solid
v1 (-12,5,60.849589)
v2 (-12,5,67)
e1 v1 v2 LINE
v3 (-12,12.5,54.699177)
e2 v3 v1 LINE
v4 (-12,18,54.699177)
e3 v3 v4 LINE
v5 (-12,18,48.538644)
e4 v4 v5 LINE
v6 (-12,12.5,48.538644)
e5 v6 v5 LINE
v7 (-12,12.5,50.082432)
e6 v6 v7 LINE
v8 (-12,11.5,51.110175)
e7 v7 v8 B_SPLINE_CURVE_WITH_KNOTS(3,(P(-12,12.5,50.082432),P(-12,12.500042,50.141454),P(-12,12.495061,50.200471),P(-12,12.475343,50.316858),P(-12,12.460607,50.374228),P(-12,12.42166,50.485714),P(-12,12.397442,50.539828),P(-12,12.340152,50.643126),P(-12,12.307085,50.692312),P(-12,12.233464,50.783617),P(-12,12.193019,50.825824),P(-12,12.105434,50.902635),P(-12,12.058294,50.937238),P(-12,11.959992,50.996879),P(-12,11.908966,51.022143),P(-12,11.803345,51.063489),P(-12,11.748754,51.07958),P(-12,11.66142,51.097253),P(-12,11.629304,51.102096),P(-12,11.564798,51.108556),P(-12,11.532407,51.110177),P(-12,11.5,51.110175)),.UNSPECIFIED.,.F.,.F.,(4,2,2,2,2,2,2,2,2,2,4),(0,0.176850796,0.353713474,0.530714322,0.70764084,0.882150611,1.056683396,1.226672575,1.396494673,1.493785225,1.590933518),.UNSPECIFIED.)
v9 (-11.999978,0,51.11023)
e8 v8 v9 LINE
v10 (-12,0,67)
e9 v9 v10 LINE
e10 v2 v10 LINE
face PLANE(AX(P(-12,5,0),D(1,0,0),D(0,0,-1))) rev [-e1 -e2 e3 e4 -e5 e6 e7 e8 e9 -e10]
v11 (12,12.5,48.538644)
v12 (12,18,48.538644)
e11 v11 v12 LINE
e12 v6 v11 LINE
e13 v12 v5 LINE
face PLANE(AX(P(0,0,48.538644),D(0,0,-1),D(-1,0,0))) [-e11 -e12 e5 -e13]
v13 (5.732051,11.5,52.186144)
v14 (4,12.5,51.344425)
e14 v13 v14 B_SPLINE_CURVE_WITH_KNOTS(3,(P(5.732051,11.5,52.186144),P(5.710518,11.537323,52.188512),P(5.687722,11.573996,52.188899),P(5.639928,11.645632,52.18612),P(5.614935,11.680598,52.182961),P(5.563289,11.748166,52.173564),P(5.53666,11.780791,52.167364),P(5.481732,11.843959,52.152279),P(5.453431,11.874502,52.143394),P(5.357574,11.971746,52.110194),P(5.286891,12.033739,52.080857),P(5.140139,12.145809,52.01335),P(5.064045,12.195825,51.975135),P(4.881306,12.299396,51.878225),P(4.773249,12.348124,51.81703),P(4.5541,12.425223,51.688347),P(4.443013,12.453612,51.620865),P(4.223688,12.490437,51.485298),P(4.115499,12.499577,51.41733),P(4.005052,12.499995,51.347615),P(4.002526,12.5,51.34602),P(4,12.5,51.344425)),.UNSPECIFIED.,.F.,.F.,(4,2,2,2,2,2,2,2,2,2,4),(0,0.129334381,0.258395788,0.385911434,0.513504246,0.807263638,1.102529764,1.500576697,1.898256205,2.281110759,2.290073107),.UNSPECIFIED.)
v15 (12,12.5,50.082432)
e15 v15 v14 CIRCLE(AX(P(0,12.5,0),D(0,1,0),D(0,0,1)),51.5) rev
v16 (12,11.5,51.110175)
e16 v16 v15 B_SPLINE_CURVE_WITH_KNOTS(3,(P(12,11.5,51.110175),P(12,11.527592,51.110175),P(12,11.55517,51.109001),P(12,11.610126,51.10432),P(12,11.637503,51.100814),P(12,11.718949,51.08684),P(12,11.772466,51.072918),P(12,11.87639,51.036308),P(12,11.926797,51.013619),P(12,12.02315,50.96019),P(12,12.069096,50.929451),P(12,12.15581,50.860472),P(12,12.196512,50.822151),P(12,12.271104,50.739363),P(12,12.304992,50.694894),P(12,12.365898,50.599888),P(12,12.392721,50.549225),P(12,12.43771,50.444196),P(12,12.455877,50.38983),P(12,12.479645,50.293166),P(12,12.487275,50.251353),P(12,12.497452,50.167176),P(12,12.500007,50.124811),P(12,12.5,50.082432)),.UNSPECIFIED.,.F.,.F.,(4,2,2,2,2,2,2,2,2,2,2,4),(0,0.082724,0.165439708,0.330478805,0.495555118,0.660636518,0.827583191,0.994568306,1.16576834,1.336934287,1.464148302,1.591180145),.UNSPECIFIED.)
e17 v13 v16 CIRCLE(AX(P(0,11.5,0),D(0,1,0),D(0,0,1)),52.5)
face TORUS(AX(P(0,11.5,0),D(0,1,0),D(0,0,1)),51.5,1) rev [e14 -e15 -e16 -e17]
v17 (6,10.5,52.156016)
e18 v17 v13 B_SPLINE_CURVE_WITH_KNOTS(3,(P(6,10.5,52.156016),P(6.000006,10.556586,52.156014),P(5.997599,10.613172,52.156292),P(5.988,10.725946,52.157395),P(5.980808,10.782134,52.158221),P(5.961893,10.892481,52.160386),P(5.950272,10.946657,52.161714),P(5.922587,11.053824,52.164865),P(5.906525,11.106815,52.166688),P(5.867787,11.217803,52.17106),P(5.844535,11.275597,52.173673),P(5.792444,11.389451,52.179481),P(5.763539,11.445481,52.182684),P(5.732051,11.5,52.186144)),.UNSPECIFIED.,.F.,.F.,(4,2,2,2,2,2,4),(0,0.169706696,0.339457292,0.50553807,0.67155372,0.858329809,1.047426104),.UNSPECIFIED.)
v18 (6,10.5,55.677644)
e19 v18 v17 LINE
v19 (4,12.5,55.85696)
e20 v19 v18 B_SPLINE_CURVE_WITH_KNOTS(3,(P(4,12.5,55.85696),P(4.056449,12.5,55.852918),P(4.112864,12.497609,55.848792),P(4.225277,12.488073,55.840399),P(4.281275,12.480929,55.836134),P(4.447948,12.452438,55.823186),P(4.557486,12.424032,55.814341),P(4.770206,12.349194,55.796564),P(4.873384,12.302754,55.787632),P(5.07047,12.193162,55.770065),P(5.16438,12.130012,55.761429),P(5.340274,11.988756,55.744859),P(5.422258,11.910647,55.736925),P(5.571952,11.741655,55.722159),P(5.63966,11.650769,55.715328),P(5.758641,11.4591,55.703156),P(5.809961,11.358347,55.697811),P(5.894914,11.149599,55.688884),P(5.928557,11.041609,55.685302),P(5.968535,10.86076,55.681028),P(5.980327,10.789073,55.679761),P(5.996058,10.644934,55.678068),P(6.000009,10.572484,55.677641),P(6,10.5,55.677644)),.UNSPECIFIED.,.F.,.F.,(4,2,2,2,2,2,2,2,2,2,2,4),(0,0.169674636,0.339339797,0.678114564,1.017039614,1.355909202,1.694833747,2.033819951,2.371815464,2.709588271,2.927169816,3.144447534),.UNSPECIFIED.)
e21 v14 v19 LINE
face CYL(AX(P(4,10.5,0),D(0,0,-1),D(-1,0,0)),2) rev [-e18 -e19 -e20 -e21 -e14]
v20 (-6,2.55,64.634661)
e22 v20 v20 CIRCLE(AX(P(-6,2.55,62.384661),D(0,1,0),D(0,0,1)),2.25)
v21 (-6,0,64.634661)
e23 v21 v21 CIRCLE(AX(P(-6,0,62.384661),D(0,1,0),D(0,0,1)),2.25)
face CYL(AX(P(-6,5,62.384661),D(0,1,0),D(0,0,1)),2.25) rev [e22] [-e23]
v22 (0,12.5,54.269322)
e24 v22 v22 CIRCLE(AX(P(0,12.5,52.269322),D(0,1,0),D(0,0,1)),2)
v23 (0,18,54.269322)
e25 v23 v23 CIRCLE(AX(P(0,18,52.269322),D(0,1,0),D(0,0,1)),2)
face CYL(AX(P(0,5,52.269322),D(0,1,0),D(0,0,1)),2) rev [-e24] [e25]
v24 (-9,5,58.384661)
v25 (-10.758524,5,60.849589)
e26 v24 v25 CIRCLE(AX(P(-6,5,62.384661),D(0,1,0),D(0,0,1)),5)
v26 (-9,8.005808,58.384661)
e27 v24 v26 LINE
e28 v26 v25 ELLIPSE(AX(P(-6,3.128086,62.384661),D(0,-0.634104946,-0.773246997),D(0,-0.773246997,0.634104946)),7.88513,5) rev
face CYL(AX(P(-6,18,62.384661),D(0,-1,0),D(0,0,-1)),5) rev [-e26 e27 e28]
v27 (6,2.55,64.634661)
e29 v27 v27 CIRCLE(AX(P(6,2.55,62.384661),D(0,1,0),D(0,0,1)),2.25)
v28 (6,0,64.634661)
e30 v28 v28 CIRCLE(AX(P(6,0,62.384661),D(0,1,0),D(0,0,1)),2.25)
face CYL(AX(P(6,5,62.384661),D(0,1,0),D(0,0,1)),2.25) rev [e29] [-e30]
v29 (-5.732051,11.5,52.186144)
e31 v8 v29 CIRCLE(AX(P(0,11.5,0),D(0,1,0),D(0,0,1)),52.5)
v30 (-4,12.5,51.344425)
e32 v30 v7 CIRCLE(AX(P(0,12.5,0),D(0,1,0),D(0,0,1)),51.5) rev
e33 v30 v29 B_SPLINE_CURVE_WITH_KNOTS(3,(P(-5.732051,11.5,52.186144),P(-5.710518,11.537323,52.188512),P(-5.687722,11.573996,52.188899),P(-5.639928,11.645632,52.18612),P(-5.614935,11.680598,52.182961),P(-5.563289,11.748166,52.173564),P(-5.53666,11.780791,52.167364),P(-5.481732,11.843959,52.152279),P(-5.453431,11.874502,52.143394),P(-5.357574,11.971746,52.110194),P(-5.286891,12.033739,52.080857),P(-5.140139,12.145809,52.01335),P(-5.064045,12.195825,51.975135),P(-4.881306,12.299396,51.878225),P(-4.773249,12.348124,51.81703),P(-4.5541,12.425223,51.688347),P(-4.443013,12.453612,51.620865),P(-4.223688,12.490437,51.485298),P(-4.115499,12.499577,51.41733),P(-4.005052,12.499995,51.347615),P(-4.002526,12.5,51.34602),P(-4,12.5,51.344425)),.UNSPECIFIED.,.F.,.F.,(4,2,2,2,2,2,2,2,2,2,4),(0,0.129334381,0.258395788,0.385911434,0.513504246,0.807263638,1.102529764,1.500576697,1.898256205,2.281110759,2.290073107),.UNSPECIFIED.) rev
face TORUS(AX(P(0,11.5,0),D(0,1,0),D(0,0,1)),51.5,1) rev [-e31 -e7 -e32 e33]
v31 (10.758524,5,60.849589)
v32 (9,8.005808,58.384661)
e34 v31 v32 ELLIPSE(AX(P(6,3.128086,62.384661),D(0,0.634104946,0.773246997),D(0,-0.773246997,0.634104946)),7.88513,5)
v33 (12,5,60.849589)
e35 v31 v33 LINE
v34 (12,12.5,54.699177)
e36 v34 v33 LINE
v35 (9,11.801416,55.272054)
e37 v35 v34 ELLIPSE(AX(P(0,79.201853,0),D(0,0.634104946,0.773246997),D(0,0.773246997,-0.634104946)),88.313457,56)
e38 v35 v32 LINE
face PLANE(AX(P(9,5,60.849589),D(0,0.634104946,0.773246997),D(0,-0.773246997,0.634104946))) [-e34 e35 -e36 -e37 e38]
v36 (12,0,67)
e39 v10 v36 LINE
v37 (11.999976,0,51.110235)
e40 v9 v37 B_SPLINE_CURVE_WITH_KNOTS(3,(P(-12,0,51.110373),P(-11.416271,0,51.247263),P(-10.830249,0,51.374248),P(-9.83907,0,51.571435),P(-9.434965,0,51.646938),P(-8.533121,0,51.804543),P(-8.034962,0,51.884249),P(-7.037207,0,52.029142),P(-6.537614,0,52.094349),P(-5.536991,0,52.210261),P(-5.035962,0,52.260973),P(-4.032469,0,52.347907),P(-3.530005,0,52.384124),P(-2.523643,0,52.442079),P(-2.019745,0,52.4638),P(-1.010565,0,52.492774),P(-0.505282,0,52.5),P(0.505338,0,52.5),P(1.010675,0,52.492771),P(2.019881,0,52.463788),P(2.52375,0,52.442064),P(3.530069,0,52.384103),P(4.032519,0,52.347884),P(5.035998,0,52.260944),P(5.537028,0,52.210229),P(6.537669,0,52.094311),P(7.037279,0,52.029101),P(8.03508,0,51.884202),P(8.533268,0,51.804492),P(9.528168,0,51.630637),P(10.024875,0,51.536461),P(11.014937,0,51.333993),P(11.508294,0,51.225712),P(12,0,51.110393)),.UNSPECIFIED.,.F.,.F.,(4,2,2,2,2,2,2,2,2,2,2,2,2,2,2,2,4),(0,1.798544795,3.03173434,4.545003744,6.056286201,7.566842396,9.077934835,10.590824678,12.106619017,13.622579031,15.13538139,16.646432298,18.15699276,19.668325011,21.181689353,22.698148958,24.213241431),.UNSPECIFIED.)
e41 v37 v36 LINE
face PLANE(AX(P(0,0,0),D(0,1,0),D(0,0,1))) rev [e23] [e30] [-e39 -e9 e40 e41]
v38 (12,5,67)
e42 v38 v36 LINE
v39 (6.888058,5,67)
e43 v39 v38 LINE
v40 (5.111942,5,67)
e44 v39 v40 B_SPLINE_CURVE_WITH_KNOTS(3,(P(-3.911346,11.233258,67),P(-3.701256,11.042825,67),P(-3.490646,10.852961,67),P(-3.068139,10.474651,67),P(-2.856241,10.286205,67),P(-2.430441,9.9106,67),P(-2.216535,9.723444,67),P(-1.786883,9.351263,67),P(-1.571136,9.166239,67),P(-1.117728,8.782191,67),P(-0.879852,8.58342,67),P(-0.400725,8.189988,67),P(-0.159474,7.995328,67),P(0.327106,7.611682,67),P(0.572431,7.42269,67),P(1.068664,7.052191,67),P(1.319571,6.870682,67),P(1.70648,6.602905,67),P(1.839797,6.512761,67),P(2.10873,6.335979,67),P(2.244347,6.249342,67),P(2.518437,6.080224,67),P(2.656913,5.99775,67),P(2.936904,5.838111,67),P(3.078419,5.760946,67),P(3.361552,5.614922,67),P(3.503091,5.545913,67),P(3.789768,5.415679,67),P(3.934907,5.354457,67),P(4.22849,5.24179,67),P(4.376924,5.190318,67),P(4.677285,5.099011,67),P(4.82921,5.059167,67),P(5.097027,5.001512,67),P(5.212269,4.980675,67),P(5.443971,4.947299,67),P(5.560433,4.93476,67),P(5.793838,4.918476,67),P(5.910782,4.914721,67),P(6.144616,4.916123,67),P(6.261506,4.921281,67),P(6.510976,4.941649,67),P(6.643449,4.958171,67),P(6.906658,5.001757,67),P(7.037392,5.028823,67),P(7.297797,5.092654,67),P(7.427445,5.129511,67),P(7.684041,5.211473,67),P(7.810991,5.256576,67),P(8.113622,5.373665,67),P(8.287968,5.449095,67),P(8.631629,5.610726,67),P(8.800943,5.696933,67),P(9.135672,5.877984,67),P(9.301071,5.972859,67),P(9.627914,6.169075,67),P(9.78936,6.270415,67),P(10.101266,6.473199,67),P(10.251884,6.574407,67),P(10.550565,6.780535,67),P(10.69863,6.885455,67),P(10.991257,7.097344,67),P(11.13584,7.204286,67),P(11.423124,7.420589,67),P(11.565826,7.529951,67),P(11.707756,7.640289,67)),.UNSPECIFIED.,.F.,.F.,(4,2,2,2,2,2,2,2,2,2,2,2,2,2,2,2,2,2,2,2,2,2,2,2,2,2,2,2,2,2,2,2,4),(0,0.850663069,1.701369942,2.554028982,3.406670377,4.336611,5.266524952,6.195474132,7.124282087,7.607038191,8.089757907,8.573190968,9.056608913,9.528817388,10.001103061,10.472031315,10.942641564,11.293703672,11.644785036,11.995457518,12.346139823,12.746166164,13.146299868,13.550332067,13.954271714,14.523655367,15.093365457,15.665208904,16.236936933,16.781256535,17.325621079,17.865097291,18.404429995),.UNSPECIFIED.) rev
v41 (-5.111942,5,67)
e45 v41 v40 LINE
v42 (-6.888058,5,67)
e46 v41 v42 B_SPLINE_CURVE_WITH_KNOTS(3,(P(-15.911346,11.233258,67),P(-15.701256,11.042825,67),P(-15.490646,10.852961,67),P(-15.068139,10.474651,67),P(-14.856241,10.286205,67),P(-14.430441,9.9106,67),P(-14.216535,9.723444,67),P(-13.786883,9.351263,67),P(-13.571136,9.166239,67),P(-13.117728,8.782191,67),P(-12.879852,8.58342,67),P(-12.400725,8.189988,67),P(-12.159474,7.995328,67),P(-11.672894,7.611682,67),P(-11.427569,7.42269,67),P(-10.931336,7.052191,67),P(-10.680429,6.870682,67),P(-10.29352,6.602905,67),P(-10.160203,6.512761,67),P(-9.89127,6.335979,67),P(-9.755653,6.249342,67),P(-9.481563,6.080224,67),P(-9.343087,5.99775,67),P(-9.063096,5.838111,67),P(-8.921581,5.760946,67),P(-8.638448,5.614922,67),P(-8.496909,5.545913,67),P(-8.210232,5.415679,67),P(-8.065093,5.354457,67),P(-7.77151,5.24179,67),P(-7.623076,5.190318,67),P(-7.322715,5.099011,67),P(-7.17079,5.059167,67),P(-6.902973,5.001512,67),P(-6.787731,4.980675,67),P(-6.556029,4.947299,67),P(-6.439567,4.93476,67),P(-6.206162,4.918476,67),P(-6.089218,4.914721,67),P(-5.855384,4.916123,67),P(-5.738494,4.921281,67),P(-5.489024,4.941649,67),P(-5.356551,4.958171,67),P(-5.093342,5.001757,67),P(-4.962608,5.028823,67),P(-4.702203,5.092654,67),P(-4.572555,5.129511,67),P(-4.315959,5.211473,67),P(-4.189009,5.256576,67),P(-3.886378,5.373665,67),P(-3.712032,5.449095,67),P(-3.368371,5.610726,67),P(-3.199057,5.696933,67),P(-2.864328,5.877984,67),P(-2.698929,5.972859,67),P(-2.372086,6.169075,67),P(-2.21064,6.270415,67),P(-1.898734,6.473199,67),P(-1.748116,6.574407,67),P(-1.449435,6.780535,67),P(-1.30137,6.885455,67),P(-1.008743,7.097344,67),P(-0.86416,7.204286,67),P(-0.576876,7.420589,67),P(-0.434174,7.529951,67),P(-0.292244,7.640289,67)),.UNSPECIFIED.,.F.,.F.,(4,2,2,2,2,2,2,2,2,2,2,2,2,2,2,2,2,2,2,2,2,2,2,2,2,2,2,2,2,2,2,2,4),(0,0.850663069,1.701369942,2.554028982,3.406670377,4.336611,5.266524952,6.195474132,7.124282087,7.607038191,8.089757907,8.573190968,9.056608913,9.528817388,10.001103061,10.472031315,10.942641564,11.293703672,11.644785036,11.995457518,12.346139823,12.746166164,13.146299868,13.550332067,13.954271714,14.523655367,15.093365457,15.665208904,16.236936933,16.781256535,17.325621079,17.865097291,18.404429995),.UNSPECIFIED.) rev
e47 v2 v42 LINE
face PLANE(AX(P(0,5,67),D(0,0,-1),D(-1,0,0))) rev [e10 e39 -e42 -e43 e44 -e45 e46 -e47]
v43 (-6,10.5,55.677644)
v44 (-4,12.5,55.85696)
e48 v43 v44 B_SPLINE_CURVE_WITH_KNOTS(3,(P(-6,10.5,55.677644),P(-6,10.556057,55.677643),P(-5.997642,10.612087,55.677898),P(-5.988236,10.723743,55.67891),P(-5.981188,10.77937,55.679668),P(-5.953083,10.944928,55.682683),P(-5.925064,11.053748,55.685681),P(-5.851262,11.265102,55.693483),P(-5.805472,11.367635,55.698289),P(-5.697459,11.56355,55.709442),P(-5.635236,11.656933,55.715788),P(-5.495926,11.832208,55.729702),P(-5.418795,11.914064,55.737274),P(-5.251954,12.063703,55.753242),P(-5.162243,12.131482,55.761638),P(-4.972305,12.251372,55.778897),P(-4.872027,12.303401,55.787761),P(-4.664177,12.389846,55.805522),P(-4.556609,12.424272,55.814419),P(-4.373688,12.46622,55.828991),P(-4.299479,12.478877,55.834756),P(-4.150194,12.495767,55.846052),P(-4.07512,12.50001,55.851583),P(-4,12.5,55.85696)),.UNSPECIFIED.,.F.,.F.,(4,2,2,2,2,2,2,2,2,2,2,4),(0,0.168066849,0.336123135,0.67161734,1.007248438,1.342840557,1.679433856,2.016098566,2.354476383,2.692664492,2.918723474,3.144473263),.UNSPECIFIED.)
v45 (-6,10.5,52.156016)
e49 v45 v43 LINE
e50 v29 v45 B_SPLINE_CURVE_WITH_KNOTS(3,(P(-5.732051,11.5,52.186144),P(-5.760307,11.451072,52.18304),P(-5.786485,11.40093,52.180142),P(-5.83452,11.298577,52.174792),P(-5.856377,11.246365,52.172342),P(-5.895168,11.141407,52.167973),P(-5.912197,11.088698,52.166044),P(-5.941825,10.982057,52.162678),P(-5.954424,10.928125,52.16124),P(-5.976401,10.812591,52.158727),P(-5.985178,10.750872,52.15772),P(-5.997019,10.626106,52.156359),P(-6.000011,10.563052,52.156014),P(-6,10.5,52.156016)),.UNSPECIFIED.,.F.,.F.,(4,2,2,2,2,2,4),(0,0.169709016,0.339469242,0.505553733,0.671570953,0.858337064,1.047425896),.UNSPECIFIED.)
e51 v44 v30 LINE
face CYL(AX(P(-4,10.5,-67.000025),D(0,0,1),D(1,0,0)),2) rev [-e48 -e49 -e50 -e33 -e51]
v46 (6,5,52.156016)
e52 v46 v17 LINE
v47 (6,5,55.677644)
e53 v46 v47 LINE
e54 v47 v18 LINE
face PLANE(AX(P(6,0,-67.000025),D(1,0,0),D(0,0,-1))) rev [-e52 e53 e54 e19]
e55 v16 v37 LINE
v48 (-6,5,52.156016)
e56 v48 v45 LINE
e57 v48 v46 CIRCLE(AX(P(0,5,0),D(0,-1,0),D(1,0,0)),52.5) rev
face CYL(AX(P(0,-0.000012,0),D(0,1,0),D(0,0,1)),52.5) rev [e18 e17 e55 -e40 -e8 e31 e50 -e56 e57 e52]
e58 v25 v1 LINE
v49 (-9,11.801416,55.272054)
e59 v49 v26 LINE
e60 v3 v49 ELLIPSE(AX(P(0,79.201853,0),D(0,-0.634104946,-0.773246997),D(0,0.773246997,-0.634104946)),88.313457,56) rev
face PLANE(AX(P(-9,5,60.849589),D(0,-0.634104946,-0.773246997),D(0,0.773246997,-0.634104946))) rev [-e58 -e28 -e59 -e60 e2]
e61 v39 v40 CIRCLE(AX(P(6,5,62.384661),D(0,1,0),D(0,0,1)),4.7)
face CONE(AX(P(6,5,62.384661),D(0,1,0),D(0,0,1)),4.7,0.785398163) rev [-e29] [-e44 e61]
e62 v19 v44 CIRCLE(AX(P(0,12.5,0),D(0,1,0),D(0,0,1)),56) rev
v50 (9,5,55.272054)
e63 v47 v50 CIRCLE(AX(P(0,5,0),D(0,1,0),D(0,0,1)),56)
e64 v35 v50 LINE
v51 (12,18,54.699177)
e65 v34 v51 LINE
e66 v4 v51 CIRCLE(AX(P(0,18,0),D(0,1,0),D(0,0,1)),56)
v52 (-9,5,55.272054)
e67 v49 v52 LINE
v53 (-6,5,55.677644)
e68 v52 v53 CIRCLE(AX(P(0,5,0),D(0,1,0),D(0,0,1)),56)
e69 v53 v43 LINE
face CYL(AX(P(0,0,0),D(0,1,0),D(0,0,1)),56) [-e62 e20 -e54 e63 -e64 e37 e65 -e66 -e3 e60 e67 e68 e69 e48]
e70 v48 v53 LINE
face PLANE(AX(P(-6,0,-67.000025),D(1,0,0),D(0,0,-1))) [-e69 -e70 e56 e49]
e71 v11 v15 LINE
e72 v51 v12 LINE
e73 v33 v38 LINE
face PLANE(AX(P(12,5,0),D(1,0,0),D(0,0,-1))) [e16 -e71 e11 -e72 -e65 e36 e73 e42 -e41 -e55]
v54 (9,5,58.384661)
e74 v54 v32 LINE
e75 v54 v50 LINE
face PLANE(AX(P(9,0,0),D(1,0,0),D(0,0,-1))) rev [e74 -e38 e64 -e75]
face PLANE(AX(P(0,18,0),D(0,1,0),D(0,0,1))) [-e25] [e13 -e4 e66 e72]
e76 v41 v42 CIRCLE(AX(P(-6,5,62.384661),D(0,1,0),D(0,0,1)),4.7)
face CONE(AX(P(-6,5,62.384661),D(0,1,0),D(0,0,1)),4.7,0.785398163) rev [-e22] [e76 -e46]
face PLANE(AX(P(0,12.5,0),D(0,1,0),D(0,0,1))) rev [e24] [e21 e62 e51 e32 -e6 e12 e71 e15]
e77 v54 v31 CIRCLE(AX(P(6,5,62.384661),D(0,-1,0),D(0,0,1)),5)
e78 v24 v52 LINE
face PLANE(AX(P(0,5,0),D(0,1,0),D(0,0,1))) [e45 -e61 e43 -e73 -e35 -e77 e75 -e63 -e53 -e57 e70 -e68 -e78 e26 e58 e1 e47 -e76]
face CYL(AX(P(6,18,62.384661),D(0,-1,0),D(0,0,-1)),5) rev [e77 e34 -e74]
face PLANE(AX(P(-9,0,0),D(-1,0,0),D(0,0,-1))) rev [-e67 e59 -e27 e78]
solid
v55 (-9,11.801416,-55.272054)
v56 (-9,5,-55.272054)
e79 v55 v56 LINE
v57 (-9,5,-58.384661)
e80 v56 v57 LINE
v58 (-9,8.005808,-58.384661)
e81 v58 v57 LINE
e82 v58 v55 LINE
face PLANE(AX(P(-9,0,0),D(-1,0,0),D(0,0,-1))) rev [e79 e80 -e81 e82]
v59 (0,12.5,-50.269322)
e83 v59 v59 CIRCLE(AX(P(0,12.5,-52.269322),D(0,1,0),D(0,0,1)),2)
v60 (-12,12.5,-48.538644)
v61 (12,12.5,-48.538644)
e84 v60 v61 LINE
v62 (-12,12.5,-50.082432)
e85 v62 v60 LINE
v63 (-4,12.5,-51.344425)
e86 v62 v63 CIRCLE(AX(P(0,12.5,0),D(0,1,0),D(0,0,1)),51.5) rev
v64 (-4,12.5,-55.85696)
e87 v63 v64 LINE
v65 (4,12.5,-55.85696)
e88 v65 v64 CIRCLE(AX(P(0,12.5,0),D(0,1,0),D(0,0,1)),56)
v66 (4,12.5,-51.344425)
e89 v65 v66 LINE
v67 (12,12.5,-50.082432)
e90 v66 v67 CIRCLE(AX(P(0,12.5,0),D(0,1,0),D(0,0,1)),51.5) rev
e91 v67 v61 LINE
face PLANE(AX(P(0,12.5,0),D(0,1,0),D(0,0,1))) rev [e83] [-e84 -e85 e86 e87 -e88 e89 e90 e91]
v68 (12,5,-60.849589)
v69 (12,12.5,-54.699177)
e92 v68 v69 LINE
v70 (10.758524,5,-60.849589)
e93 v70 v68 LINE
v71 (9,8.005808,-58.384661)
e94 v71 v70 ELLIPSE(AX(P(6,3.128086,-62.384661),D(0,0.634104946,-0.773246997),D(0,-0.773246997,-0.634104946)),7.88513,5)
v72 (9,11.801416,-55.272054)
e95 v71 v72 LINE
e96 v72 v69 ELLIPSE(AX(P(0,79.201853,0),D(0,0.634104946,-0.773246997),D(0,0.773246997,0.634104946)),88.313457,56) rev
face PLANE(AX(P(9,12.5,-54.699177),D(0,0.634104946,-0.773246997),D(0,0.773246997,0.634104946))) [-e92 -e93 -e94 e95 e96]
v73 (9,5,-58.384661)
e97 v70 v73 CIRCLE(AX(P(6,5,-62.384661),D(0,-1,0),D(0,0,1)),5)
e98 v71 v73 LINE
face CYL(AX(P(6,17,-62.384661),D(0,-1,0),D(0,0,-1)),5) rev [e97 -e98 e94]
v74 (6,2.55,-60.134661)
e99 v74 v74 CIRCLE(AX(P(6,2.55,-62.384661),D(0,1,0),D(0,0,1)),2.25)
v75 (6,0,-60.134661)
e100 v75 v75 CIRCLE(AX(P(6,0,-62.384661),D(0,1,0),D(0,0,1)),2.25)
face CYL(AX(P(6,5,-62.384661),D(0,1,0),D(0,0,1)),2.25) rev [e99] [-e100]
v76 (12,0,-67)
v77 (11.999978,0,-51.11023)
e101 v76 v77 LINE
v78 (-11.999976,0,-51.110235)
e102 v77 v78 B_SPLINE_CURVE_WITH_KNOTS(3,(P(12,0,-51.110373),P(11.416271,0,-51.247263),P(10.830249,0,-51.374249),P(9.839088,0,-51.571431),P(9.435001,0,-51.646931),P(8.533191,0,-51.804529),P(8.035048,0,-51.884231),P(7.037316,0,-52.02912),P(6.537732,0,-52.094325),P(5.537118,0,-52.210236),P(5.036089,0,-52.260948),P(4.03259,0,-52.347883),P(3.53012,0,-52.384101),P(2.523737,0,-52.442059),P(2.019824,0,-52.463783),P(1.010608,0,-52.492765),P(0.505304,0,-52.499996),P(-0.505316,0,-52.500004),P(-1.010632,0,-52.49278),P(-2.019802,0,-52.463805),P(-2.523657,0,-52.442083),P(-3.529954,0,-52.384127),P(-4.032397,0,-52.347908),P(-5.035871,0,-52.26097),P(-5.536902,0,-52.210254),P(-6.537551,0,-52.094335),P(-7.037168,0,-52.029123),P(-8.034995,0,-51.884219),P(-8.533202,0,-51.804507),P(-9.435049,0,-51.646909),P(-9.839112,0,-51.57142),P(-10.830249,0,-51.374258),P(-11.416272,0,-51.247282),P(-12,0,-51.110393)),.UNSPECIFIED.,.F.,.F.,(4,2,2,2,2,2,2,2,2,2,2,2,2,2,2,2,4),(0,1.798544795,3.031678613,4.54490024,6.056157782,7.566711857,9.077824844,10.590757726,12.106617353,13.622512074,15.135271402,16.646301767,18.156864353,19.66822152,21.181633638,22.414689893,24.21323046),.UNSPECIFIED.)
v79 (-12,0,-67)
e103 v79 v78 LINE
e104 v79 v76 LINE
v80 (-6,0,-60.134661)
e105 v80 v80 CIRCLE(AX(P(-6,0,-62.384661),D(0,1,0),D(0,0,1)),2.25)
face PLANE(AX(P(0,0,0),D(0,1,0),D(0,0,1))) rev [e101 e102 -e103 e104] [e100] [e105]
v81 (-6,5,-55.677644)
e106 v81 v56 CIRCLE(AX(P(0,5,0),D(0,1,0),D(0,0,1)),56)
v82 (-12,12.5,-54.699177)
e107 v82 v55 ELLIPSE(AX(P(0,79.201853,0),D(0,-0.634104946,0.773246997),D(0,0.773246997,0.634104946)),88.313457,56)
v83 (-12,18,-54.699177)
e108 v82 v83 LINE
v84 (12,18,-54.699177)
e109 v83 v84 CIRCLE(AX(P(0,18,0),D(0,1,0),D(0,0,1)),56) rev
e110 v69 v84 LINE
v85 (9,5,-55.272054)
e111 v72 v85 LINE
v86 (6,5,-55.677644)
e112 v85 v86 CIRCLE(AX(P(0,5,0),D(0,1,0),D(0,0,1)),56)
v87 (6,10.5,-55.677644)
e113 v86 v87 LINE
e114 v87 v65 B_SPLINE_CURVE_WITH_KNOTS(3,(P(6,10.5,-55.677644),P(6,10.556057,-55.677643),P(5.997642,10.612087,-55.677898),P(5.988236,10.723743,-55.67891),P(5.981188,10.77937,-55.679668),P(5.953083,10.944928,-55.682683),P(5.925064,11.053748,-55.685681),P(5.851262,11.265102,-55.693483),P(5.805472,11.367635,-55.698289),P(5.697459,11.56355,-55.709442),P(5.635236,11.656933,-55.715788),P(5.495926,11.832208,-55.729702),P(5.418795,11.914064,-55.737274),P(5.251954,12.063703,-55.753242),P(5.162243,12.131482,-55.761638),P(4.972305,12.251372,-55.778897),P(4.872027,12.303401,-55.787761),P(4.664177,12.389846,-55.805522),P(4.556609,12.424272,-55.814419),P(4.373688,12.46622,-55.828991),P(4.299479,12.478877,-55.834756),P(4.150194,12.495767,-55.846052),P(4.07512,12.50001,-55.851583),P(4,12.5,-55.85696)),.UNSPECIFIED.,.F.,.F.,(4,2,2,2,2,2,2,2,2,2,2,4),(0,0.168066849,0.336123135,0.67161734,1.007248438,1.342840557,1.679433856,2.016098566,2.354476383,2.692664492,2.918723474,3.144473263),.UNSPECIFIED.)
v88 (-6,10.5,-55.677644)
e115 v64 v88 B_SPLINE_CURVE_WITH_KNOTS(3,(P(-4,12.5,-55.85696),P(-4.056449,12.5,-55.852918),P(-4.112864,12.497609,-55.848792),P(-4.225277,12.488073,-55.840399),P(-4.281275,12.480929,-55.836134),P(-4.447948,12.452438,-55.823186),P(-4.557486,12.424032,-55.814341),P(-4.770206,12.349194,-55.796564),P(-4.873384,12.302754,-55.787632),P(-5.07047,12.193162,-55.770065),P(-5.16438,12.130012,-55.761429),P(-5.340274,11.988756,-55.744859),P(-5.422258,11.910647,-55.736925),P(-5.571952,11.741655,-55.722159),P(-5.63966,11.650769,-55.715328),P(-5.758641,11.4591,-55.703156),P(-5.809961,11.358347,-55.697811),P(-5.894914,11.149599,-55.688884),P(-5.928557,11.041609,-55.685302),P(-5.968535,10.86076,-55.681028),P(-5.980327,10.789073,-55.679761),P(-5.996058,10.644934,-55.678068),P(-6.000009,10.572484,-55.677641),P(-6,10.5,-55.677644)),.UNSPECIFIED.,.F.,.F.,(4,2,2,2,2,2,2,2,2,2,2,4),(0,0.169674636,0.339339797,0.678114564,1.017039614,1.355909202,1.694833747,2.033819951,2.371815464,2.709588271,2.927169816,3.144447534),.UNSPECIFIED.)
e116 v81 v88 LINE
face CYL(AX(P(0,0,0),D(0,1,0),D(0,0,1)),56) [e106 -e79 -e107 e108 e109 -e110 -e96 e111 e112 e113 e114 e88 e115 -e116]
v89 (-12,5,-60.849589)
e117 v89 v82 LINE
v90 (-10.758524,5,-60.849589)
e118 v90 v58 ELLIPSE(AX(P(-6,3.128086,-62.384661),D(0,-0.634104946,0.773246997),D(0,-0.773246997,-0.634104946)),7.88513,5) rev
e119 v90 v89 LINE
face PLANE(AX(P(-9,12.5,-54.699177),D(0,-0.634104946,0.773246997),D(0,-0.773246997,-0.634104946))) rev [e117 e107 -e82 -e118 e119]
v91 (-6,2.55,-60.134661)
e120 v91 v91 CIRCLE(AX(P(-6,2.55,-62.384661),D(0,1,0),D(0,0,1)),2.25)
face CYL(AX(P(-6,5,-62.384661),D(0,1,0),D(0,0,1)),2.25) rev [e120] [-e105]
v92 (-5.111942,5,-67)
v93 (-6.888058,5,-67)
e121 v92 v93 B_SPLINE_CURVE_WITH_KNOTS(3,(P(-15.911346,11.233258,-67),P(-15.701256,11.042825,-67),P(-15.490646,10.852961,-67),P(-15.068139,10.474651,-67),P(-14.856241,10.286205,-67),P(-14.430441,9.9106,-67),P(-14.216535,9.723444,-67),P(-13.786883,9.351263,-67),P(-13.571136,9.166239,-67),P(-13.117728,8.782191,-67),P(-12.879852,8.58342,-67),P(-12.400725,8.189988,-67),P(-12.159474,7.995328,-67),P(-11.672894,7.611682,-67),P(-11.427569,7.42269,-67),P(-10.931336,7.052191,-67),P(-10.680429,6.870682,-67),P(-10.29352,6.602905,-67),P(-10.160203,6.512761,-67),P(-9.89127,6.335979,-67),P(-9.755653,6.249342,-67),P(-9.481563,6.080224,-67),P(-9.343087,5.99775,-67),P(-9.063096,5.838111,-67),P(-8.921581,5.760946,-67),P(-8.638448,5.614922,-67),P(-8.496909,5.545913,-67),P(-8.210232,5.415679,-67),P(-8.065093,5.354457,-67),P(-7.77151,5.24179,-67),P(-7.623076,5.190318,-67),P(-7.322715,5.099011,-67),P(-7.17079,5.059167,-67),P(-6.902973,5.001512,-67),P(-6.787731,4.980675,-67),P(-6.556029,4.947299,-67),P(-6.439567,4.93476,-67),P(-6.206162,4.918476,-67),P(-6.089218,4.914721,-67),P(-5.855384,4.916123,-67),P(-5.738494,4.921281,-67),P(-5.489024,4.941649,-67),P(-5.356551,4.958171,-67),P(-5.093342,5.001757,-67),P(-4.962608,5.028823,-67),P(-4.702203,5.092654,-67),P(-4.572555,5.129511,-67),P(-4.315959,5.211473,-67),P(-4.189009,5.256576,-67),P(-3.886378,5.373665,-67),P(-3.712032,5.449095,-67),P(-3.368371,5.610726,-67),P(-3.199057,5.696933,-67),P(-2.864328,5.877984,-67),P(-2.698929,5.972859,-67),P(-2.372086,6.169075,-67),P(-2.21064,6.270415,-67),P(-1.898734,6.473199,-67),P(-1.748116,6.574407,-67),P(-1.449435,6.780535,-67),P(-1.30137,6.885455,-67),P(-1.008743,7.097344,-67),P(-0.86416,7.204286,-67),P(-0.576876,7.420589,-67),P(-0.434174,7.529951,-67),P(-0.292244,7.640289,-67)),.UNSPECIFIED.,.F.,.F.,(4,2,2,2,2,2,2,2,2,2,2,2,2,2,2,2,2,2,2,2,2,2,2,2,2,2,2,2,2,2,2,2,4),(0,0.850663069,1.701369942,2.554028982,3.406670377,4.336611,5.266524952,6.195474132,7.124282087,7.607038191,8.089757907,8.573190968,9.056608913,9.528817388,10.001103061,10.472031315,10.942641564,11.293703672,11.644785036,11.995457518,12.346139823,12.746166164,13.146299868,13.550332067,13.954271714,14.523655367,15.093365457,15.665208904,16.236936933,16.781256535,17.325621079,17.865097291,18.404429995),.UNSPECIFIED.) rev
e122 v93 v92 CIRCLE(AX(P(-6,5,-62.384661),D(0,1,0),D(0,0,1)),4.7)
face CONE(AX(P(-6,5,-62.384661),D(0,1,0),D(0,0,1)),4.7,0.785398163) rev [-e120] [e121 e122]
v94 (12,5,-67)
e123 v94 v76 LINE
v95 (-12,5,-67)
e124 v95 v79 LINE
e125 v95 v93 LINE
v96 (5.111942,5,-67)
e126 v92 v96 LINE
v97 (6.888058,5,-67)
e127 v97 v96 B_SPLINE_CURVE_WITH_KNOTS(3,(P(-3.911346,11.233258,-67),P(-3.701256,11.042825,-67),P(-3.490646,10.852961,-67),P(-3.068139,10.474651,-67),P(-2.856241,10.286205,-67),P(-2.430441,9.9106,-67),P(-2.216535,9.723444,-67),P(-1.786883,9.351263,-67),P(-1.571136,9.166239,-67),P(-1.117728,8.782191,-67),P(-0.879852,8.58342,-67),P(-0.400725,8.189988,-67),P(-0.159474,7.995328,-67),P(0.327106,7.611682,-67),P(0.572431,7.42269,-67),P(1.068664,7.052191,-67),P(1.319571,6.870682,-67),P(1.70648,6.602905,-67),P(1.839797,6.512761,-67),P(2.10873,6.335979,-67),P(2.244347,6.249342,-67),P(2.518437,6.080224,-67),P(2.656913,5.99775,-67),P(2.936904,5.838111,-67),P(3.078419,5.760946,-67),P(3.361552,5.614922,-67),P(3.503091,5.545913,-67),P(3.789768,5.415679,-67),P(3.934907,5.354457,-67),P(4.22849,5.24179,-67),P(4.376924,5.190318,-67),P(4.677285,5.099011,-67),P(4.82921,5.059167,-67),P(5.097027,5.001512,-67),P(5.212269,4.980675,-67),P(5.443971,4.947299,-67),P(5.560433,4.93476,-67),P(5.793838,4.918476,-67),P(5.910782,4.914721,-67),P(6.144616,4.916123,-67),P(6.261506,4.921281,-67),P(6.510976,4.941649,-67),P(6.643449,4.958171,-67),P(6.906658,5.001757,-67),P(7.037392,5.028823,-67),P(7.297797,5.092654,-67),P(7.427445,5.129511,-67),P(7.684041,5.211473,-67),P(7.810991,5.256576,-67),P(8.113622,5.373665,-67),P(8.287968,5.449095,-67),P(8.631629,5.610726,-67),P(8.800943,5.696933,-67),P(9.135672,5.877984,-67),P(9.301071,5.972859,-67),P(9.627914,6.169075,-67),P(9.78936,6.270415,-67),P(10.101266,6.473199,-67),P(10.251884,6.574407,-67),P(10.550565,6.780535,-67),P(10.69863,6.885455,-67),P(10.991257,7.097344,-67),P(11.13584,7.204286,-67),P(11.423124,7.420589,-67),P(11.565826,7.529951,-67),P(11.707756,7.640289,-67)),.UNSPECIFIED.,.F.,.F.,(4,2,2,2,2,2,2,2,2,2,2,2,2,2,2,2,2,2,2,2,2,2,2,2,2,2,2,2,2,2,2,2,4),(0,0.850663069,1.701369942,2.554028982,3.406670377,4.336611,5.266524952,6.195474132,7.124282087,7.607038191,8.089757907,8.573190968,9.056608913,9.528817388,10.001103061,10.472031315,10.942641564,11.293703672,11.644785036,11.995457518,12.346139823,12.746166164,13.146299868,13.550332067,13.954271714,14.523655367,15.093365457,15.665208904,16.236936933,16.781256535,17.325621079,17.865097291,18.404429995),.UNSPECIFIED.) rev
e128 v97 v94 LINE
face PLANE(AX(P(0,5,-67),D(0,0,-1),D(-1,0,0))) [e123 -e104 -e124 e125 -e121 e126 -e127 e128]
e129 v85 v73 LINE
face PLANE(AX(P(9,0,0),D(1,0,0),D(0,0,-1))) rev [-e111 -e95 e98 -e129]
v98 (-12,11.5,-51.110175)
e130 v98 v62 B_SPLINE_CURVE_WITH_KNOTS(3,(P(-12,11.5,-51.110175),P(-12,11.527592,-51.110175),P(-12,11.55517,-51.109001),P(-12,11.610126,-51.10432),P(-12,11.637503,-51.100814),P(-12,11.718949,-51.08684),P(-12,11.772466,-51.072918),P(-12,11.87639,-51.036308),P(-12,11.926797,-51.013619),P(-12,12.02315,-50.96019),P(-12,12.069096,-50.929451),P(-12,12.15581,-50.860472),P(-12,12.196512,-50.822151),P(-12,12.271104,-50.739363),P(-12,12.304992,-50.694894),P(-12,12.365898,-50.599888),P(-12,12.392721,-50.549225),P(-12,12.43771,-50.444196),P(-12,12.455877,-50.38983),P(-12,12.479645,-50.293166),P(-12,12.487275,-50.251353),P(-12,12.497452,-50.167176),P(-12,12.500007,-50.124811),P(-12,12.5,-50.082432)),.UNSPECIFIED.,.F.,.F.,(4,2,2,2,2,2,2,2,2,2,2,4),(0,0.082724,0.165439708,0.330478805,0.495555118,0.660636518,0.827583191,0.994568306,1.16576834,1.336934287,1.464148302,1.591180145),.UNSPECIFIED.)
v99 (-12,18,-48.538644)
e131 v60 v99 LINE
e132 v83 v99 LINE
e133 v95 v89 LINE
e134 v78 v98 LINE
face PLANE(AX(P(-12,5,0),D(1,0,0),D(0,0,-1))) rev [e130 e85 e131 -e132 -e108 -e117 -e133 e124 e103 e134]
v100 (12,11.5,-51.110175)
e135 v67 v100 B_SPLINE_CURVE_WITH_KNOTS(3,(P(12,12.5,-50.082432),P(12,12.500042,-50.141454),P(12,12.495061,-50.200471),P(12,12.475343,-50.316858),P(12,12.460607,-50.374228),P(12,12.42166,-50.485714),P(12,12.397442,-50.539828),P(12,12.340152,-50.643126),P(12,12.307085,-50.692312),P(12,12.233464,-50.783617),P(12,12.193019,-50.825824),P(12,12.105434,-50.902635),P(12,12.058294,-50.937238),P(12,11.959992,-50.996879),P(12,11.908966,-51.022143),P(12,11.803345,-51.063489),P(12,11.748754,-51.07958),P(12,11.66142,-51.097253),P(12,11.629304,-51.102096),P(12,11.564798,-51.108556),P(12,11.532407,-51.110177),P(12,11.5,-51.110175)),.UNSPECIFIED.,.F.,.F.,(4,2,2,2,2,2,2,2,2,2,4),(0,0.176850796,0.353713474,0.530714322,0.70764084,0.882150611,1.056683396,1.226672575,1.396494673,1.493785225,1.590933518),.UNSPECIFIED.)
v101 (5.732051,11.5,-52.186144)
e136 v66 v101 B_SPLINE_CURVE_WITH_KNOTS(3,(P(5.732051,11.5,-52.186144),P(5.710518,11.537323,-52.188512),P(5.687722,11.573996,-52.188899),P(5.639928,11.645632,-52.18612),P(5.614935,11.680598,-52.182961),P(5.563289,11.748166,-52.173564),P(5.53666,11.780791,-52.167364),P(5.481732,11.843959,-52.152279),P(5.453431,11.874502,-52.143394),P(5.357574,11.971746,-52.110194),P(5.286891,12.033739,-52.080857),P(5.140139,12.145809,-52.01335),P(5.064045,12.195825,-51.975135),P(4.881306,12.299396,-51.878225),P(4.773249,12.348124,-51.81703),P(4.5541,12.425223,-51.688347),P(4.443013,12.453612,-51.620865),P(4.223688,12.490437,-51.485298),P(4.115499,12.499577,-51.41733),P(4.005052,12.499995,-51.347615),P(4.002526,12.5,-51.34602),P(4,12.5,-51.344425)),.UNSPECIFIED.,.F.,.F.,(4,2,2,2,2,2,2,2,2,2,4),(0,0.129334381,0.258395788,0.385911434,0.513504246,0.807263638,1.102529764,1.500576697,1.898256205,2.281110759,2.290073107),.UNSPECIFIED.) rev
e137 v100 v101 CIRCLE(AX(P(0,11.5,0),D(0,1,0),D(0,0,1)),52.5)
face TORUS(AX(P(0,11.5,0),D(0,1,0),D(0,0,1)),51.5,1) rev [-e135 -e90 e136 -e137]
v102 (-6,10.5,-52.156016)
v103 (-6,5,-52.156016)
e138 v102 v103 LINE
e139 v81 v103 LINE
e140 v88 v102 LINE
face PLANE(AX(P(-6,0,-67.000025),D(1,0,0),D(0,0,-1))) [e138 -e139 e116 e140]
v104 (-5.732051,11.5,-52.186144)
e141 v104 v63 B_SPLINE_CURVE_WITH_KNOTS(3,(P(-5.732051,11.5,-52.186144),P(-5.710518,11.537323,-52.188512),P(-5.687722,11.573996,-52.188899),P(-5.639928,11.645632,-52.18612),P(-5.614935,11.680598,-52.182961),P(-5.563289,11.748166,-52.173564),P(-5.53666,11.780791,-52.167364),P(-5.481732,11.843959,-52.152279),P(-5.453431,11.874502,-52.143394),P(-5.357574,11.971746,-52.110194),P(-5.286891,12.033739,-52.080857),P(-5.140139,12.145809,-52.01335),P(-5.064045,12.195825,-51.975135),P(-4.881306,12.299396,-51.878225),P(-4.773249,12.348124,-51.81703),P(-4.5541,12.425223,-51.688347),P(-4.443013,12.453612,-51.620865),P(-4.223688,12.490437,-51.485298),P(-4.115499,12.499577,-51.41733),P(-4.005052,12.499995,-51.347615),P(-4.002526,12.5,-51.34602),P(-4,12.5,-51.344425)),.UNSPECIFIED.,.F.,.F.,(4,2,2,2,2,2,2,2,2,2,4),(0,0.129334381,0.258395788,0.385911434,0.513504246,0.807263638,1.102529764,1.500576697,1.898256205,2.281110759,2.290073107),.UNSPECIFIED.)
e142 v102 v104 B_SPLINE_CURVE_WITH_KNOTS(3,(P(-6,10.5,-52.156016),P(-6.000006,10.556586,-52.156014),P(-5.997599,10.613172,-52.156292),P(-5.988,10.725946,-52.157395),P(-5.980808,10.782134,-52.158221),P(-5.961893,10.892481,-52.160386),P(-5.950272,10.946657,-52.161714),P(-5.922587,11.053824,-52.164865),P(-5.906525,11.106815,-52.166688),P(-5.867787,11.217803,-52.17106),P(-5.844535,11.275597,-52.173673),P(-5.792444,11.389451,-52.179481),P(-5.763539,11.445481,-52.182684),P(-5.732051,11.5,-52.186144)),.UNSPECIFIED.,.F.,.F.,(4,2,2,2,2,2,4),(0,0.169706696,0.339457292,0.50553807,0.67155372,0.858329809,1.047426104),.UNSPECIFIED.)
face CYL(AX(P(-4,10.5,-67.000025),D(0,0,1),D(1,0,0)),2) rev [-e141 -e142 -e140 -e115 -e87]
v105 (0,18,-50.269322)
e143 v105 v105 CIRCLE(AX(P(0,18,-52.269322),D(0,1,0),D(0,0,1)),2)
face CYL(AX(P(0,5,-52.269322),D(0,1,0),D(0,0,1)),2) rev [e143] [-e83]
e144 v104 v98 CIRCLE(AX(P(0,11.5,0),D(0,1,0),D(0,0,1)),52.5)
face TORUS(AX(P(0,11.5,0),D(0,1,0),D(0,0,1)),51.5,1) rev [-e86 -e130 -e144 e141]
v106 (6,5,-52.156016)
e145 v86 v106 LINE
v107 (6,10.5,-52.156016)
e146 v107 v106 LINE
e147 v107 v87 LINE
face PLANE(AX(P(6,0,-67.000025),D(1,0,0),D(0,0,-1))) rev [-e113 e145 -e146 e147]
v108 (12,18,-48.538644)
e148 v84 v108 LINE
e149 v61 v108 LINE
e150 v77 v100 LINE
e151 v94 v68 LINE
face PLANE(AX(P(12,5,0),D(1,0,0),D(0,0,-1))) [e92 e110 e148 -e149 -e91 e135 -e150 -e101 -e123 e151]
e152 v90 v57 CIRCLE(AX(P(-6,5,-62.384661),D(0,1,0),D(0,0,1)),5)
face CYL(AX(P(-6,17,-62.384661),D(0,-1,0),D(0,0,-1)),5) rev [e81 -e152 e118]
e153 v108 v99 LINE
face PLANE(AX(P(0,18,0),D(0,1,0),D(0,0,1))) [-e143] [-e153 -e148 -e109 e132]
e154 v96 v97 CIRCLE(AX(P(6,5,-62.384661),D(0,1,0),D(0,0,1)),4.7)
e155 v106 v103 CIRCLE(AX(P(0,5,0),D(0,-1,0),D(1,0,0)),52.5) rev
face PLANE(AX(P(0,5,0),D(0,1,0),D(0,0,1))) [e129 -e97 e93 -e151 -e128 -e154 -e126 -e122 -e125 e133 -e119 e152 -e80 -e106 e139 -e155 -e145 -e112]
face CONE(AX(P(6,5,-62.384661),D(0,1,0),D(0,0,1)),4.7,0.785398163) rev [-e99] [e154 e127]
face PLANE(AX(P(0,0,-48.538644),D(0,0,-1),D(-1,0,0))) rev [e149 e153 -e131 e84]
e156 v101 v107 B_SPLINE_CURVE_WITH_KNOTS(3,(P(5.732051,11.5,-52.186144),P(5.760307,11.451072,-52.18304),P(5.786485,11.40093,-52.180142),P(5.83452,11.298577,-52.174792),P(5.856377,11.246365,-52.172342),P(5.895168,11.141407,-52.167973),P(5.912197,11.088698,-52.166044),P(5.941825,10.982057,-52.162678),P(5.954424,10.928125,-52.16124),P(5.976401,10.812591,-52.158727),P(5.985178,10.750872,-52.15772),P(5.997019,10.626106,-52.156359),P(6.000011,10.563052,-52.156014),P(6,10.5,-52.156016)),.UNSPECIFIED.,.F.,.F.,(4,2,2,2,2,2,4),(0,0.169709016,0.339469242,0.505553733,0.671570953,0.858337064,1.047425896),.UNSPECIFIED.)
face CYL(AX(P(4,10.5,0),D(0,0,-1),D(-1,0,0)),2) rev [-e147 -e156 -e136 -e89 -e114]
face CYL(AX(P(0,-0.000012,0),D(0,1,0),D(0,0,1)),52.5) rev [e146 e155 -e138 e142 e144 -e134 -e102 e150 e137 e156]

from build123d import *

# Parameters (mm, degrees)
BOSS_EXTRUDE2_DEPTH                            = 5
BOSS_EXTRUDE2_2_DEPTH                          = 5
CSK_FOR_M4_FLAT_HEAD_MACHINE_SCREW3_AT_2_COUNT = 2
CSK_FOR_M4_FLAT_HEAD_MACHINE_SCREW3_AT_2_PITCH = 12
CSK_FOR_M4_FLAT_HEAD_MACHINE_SCREW5_AT_2_COUNT = 2
CSK_FOR_M4_FLAT_HEAD_MACHINE_SCREW5_AT_2_PITCH = 12
BOSS_EXTRUDE3_DEPTH                            = 13
BOSS_EXTRUDE3_DEPTH_BACK                       = 5
BOSS_EXTRUDE3_2_DEPTH                          = 13
BOSS_EXTRUDE3_2_DEPTH_BACK                     = 5
BOSS_EXTRUDE4_DEPTH                            = 3
BOSS_EXTRUDE5_DEPTH                            = 3
CUT_EXTRUDE5_DEPTH                             = 12.5
CUT_EXTRUDE5_DEPTH_BACK                        = 71.405965656
SKETCH28_R                                     = 52.5
FILLET5_R                                      = 1
FILLET6_R                                      = 1
SKETCH30_R                                     = 5
CUT_EXTRUDE10_DEPTH                            = 13
MIRROR4_START                                  = 5
MIRROR4_DEPTH                                  = 3.005808181
CUT_EXTRUDE11_DEPTH                            = 118.546494541
CUT_EXTRUDE11_DEPTH_BACK                       = 13
CUT_EXTRUDE12_DEPTH                            = 13
SKETCH32_R                                     = 5
CUT_EXTRUDE13_DEPTH                            = 12
FILLET7_R                                      = 2
FILLET8_R                                      = 2


# Read off the part's stored shape, not the designer's step: Mirror4
with BuildPart() as part:
    # Sketch2 → Boss-Extrude2 (new body)
    with BuildSketch(Plane(origin=(0, 0, 0), x_dir=(1, 0, 0), z_dir=(0, 1, 0))):
        with BuildLine():
            Line((-12, -67), (12, -67))
            Line((12, -67), (12, -54.699177325))
            ThreePointArc((12, -54.699177325), (0, -56), (-12, -54.699177325))
            Line((-12, -54.699177325), (-12, -67))
        make_face()
    extrude(amount=BOSS_EXTRUDE2_DEPTH)

    # Sketch9 → CSK for M4 Flat Head Machine Screw5 (revolve, cut)
    with BuildSketch(Plane(origin=(-6, 5, 62.3846611), x_dir=(0, 0, 1), z_dir=(1, 0, 0))):
        Polygon((0, 0), (0, 5), (2.25, 5), (2.25, 2.45), (4.7, 0), align=None)
    csk_for_m4_flat_head_machine_screw5 = revolve(axis=Axis((-6, 11.35, 62.3846611), (0, -1, 0)), mode=Mode.SUBTRACT)

    # CSK for M4 Flat Head Machine Screw5 at 2: CSK for M4 Flat Head Machine Screw5 ×2
    with Locations(*[(i * CSK_FOR_M4_FLAT_HEAD_MACHINE_SCREW5_AT_2_PITCH, 0, 0) for i in range(1, CSK_FOR_M4_FLAT_HEAD_MACHINE_SCREW5_AT_2_COUNT)]):
        add(csk_for_m4_flat_head_machine_screw5, mode=Mode.SUBTRACT)



with BuildPart() as body_2:
    # Sketch2 → Boss-Extrude2 2 (new body)
    with BuildSketch(Plane(origin=(0, 0, 0), x_dir=(1, 0, 0), z_dir=(0, 1, 0))):
        with BuildLine():
            Line((-12, 67), (-12, 54.699177325))
            ThreePointArc((-12, 54.699177325), (0, 56), (12, 54.699177325))
            Line((12, 54.699177325), (12, 67))
            Line((12, 67), (-12, 67))
        make_face()
    extrude(amount=BOSS_EXTRUDE2_2_DEPTH)

    # Sketch6 → CSK for M4 Flat Head Machine Screw3 (revolve, cut)
    with BuildSketch(Plane(origin=(6, 5, -62.3846611), x_dir=(0, 0, 1), z_dir=(1, 0, 0))):
        Polygon((0, 0), (0, 5), (2.25, 5), (2.25, 2.45), (4.7, 0), align=None)
    csk_for_m4_flat_head_machine_screw3 = revolve(axis=Axis((6, 11.35, -62.3846611), (0, -1, 0)), mode=Mode.SUBTRACT)

    # CSK for M4 Flat Head Machine Screw3 at 2: CSK for M4 Flat Head Machine Screw3 ×2
    with Locations(*[(-i * CSK_FOR_M4_FLAT_HEAD_MACHINE_SCREW3_AT_2_PITCH, 0, 0) for i in range(1, CSK_FOR_M4_FLAT_HEAD_MACHINE_SCREW3_AT_2_COUNT)]):
        add(csk_for_m4_flat_head_machine_screw3, mode=Mode.SUBTRACT)



with BuildPart() as body_3:
    # Sketch10 → Boss-Extrude3 (new, two sides: drawn at the far end of the back side and taken through both)
    with BuildSketch(Plane(origin=(0, 5, 0), x_dir=(1, 0, 0), z_dir=(0, 1, 0)).offset(-BOSS_EXTRUDE3_DEPTH_BACK)):
        with BuildLine():
            Line((-12, -48.5386444), (-12, -54.699177325))
            ThreePointArc((-12, -54.699177325), (0, -56), (12, -54.699177325))
            Line((12, -54.699177325), (12, -48.5386444))
            Line((12, -48.5386444), (-12, -48.5386444))
        make_face()
    extrude(amount=BOSS_EXTRUDE3_DEPTH + BOSS_EXTRUDE3_DEPTH_BACK)


with BuildPart() as body_4:
    # Sketch10 → Boss-Extrude3 2 (new, two sides: drawn at the far end of the back side and taken through both)
    with BuildSketch(Plane(origin=(0, 5, 0), x_dir=(1, 0, 0), z_dir=(0, 1, 0)).offset(-BOSS_EXTRUDE3_2_DEPTH_BACK)):
        with BuildLine():
            ThreePointArc((12, 54.699177325), (0, 56), (-12, 54.699177325))
            Line((-12, 54.699177325), (-12, 48.5386444))
            Line((-12, 48.5386444), (12, 48.5386444))
            Line((12, 48.5386444), (12, 54.699177325))
        make_face()
    extrude(amount=BOSS_EXTRUDE3_2_DEPTH + BOSS_EXTRUDE3_2_DEPTH_BACK)


with BuildPart() as part_1:
    add(part.part)

    add(body_3.part)  # Boss-Extrude4 merges body 3
    # Sketch21 → Boss-Extrude4 (add)
    with BuildSketch(Plane(origin=(12, 0, 0), x_dir=(0, 0, -1), z_dir=(1, 0, 0))):
        Polygon((-54.699177325, 5), (-54.699177325, 12.5), (-60.849588662, 5), align=None)
    boss_extrude4 = extrude(amount=-BOSS_EXTRUDE4_DEPTH)

    # Mirror1: Boss-Extrude4 across plane
    add(boss_extrude4.mirror(Plane(origin=(0, 0, 0), x_dir=(0, 0, 1), z_dir=(1, 0, 0))))


with BuildPart() as body_2_1:
    add(body_2.part)

    add(body_4.part)  # Boss-Extrude5 merges body 4
    # Sketch22 → Boss-Extrude5 (add)
    with BuildSketch(Plane(origin=(12, 0, 0), x_dir=(0, 0, -1), z_dir=(1, 0, 0))):
        Polygon((54.699177325, 12.5), (60.849588662, 5), (54.699177325, 5), align=None)
    boss_extrude5 = extrude(amount=-BOSS_EXTRUDE5_DEPTH)

    # Mirror2: Boss-Extrude5 across plane
    add(boss_extrude5.mirror(Plane(origin=(0, 0, 0), x_dir=(0, 0, 1), z_dir=(1, 0, 0))))


with BuildPart() as cut_extrude5_tool:
    # Sketch28 → Cut-Extrude5 (new, two sides: drawn at the far end of the back side and taken through both)
    with BuildSketch(Plane(origin=(0, 0, 0), x_dir=(1, 0, 0), z_dir=(0, 1, 0)).offset(-CUT_EXTRUDE5_DEPTH_BACK)):
        Circle(SKETCH28_R)
    extrude(amount=CUT_EXTRUDE5_DEPTH + CUT_EXTRUDE5_DEPTH_BACK)


with BuildPart() as part_2:
    add(part_1.part)

    # Cut-Extrude5: cut by cut_extrude5_tool
    add(cut_extrude5_tool.part, mode=Mode.SUBTRACT)

    # Fillet6
    fillet6_edges = [part_2.edges().sort_by_distance(p)[0] for p in [
        (0, 12.5, 52.5),
    ]]
    fillet(fillet6_edges, radius=FILLET6_R)

    # Sketch30 → Cut-Extrude10 (cut)
    with BuildSketch(Plane(origin=(0, 5, 0), x_dir=(1, 0, 0), z_dir=(0, 1, 0))):
        with Locations((-6, -62.3846611)):
            Circle(SKETCH30_R)
    extrude(amount=CUT_EXTRUDE10_DEPTH, mode=Mode.SUBTRACT)

    # Mirror4 outline → Mirror4 (cut)
    with BuildSketch(Plane(origin=(0, 0, 0), x_dir=(1, 0, 0), z_dir=(0, 1, 0)).offset(MIRROR4_START)):
        with BuildLine():
            ThreePointArc((10.758524205, -60.849588662), (10.070336771, -59.480808733), (9, -58.3846611))
            Line((9, -58.3846611), (9, -62))
            Line((9, -62), (11.129640262, -62))
            Line((11.129640262, -62), (10.758524205, -60.849588662))
        make_face()
    extrude(amount=MIRROR4_DEPTH, mode=Mode.SUBTRACT)


with BuildPart() as body_2_2:
    add(body_2_1.part)

    # Cut-Extrude5: cut by cut_extrude5_tool
    add(cut_extrude5_tool.part, mode=Mode.SUBTRACT)

    # Fillet5
    fillet5_edges = [body_2_2.edges().sort_by_distance(p)[0] for p in [
        (0, 12.5, -52.5),
    ]]
    fillet(fillet5_edges, radius=FILLET5_R)


with BuildPart() as cut_extrude11_tool:
    # Sketch31 → Cut-Extrude11 (new, two sides: drawn at the far end of the back side and taken through both)
    with BuildSketch(Plane(origin=(0, 0, 48.5386444), x_dir=(-1, 0, 0), z_dir=(0, 0, -1)).offset(-CUT_EXTRUDE11_DEPTH_BACK)):
        Polygon((0, 5), (0, 8.75), (0, 12.5), (-6, 12.5), (-6, 5), align=None)
        Polygon((0, 12.5), (0, 8.75), (0, 5), (6, 5), (6, 12.5), align=None)
    extrude(amount=CUT_EXTRUDE11_DEPTH + CUT_EXTRUDE11_DEPTH_BACK)


with BuildPart() as part_3:
    add(part_2.part)

    # Cut-Extrude11: cut by cut_extrude11_tool
    add(cut_extrude11_tool.part, mode=Mode.SUBTRACT)


with BuildPart() as body_2_3:
    add(body_2_2.part)

    # Cut-Extrude11: cut by cut_extrude11_tool
    add(cut_extrude11_tool.part, mode=Mode.SUBTRACT)


with BuildPart() as cut_extrude12_tool:
    # Sketch14 → Cut-Extrude12 (new body)
    with BuildSketch(Plane(origin=(0, 18, 0), x_dir=(1, 0, 0), z_dir=(0, 1, 0))):
        with BuildLine():
            ThreePointArc((2, 52.2693222), (1.414213562, 53.683535762), (0, 54.2693222))
            Line((0, 54.2693222), (0, 50.2693222))
            ThreePointArc((0, 50.2693222), (1.414213562, 50.855108638), (2, 52.2693222))
        make_face()
        with BuildLine():
            Line((0, 50.2693222), (0, 54.2693222))
            ThreePointArc((0, 54.2693222), (-2, 52.2693222), (0, 50.2693222))
        make_face()
        with BuildLine():
            ThreePointArc((0, -50.2693222), (-2, -52.2693222), (0, -54.2693222))
            Line((0, -54.2693222), (0, -50.2693222))
        make_face()
        with BuildLine():
            Line((0, -50.2693222), (0, -54.2693222))
            ThreePointArc((0, -54.2693222), (1.414213562, -53.683535762), (2, -52.2693222))
            ThreePointArc((2, -52.2693222), (1.414213562, -50.855108638), (0, -50.2693222))
        make_face()
    extrude(amount=-CUT_EXTRUDE12_DEPTH)


with BuildPart() as part_4:
    add(part_3.part)

    # Cut-Extrude12: cut by cut_extrude12_tool
    add(cut_extrude12_tool.part, mode=Mode.SUBTRACT)

    # Fillet7
    fillet7_edges = [part_4.edges().sort_by_distance(p)[0] for p in [
        (6, 12.5, 53.413467462),
        (-6, 12.5, 53.413467462),
    ]]
    fillet(fillet7_edges, radius=FILLET7_R - 0.0004)  # a hair under: the kernel refuses the full size


with BuildPart() as body_2_4:
    add(body_2_3.part)

    # Cut-Extrude12: cut by cut_extrude12_tool
    add(cut_extrude12_tool.part, mode=Mode.SUBTRACT)

    # Sketch32 → Cut-Extrude13 (cut)
    with BuildSketch(Plane(origin=(0, 5, 0), x_dir=(1, 0, 0), z_dir=(0, 1, 0))):
        with Locations((-6, 62.3846611)):
            Circle(SKETCH32_R)
    cut_extrude13 = extrude(amount=CUT_EXTRUDE13_DEPTH, mode=Mode.SUBTRACT)

    # Mirror5: Cut-Extrude13 across plane
    add(cut_extrude13.mirror(Plane(origin=(0, 0, 0), x_dir=(0, 0, 1), z_dir=(1, 0, 0))), mode=Mode.SUBTRACT)

    # Fillet8
    fillet8_edges = [body_2_4.edges().sort_by_distance(p)[0] for p in [
        (6, 12.5, -53.413467462),
        (-6, 12.5, -53.413467462),
    ]]
    fillet(fillet8_edges, radius=FILLET8_R - 0.0004)  # a hair under: the kernel refuses the full size


solid = Compound([part_4.part, body_2_4.part])
